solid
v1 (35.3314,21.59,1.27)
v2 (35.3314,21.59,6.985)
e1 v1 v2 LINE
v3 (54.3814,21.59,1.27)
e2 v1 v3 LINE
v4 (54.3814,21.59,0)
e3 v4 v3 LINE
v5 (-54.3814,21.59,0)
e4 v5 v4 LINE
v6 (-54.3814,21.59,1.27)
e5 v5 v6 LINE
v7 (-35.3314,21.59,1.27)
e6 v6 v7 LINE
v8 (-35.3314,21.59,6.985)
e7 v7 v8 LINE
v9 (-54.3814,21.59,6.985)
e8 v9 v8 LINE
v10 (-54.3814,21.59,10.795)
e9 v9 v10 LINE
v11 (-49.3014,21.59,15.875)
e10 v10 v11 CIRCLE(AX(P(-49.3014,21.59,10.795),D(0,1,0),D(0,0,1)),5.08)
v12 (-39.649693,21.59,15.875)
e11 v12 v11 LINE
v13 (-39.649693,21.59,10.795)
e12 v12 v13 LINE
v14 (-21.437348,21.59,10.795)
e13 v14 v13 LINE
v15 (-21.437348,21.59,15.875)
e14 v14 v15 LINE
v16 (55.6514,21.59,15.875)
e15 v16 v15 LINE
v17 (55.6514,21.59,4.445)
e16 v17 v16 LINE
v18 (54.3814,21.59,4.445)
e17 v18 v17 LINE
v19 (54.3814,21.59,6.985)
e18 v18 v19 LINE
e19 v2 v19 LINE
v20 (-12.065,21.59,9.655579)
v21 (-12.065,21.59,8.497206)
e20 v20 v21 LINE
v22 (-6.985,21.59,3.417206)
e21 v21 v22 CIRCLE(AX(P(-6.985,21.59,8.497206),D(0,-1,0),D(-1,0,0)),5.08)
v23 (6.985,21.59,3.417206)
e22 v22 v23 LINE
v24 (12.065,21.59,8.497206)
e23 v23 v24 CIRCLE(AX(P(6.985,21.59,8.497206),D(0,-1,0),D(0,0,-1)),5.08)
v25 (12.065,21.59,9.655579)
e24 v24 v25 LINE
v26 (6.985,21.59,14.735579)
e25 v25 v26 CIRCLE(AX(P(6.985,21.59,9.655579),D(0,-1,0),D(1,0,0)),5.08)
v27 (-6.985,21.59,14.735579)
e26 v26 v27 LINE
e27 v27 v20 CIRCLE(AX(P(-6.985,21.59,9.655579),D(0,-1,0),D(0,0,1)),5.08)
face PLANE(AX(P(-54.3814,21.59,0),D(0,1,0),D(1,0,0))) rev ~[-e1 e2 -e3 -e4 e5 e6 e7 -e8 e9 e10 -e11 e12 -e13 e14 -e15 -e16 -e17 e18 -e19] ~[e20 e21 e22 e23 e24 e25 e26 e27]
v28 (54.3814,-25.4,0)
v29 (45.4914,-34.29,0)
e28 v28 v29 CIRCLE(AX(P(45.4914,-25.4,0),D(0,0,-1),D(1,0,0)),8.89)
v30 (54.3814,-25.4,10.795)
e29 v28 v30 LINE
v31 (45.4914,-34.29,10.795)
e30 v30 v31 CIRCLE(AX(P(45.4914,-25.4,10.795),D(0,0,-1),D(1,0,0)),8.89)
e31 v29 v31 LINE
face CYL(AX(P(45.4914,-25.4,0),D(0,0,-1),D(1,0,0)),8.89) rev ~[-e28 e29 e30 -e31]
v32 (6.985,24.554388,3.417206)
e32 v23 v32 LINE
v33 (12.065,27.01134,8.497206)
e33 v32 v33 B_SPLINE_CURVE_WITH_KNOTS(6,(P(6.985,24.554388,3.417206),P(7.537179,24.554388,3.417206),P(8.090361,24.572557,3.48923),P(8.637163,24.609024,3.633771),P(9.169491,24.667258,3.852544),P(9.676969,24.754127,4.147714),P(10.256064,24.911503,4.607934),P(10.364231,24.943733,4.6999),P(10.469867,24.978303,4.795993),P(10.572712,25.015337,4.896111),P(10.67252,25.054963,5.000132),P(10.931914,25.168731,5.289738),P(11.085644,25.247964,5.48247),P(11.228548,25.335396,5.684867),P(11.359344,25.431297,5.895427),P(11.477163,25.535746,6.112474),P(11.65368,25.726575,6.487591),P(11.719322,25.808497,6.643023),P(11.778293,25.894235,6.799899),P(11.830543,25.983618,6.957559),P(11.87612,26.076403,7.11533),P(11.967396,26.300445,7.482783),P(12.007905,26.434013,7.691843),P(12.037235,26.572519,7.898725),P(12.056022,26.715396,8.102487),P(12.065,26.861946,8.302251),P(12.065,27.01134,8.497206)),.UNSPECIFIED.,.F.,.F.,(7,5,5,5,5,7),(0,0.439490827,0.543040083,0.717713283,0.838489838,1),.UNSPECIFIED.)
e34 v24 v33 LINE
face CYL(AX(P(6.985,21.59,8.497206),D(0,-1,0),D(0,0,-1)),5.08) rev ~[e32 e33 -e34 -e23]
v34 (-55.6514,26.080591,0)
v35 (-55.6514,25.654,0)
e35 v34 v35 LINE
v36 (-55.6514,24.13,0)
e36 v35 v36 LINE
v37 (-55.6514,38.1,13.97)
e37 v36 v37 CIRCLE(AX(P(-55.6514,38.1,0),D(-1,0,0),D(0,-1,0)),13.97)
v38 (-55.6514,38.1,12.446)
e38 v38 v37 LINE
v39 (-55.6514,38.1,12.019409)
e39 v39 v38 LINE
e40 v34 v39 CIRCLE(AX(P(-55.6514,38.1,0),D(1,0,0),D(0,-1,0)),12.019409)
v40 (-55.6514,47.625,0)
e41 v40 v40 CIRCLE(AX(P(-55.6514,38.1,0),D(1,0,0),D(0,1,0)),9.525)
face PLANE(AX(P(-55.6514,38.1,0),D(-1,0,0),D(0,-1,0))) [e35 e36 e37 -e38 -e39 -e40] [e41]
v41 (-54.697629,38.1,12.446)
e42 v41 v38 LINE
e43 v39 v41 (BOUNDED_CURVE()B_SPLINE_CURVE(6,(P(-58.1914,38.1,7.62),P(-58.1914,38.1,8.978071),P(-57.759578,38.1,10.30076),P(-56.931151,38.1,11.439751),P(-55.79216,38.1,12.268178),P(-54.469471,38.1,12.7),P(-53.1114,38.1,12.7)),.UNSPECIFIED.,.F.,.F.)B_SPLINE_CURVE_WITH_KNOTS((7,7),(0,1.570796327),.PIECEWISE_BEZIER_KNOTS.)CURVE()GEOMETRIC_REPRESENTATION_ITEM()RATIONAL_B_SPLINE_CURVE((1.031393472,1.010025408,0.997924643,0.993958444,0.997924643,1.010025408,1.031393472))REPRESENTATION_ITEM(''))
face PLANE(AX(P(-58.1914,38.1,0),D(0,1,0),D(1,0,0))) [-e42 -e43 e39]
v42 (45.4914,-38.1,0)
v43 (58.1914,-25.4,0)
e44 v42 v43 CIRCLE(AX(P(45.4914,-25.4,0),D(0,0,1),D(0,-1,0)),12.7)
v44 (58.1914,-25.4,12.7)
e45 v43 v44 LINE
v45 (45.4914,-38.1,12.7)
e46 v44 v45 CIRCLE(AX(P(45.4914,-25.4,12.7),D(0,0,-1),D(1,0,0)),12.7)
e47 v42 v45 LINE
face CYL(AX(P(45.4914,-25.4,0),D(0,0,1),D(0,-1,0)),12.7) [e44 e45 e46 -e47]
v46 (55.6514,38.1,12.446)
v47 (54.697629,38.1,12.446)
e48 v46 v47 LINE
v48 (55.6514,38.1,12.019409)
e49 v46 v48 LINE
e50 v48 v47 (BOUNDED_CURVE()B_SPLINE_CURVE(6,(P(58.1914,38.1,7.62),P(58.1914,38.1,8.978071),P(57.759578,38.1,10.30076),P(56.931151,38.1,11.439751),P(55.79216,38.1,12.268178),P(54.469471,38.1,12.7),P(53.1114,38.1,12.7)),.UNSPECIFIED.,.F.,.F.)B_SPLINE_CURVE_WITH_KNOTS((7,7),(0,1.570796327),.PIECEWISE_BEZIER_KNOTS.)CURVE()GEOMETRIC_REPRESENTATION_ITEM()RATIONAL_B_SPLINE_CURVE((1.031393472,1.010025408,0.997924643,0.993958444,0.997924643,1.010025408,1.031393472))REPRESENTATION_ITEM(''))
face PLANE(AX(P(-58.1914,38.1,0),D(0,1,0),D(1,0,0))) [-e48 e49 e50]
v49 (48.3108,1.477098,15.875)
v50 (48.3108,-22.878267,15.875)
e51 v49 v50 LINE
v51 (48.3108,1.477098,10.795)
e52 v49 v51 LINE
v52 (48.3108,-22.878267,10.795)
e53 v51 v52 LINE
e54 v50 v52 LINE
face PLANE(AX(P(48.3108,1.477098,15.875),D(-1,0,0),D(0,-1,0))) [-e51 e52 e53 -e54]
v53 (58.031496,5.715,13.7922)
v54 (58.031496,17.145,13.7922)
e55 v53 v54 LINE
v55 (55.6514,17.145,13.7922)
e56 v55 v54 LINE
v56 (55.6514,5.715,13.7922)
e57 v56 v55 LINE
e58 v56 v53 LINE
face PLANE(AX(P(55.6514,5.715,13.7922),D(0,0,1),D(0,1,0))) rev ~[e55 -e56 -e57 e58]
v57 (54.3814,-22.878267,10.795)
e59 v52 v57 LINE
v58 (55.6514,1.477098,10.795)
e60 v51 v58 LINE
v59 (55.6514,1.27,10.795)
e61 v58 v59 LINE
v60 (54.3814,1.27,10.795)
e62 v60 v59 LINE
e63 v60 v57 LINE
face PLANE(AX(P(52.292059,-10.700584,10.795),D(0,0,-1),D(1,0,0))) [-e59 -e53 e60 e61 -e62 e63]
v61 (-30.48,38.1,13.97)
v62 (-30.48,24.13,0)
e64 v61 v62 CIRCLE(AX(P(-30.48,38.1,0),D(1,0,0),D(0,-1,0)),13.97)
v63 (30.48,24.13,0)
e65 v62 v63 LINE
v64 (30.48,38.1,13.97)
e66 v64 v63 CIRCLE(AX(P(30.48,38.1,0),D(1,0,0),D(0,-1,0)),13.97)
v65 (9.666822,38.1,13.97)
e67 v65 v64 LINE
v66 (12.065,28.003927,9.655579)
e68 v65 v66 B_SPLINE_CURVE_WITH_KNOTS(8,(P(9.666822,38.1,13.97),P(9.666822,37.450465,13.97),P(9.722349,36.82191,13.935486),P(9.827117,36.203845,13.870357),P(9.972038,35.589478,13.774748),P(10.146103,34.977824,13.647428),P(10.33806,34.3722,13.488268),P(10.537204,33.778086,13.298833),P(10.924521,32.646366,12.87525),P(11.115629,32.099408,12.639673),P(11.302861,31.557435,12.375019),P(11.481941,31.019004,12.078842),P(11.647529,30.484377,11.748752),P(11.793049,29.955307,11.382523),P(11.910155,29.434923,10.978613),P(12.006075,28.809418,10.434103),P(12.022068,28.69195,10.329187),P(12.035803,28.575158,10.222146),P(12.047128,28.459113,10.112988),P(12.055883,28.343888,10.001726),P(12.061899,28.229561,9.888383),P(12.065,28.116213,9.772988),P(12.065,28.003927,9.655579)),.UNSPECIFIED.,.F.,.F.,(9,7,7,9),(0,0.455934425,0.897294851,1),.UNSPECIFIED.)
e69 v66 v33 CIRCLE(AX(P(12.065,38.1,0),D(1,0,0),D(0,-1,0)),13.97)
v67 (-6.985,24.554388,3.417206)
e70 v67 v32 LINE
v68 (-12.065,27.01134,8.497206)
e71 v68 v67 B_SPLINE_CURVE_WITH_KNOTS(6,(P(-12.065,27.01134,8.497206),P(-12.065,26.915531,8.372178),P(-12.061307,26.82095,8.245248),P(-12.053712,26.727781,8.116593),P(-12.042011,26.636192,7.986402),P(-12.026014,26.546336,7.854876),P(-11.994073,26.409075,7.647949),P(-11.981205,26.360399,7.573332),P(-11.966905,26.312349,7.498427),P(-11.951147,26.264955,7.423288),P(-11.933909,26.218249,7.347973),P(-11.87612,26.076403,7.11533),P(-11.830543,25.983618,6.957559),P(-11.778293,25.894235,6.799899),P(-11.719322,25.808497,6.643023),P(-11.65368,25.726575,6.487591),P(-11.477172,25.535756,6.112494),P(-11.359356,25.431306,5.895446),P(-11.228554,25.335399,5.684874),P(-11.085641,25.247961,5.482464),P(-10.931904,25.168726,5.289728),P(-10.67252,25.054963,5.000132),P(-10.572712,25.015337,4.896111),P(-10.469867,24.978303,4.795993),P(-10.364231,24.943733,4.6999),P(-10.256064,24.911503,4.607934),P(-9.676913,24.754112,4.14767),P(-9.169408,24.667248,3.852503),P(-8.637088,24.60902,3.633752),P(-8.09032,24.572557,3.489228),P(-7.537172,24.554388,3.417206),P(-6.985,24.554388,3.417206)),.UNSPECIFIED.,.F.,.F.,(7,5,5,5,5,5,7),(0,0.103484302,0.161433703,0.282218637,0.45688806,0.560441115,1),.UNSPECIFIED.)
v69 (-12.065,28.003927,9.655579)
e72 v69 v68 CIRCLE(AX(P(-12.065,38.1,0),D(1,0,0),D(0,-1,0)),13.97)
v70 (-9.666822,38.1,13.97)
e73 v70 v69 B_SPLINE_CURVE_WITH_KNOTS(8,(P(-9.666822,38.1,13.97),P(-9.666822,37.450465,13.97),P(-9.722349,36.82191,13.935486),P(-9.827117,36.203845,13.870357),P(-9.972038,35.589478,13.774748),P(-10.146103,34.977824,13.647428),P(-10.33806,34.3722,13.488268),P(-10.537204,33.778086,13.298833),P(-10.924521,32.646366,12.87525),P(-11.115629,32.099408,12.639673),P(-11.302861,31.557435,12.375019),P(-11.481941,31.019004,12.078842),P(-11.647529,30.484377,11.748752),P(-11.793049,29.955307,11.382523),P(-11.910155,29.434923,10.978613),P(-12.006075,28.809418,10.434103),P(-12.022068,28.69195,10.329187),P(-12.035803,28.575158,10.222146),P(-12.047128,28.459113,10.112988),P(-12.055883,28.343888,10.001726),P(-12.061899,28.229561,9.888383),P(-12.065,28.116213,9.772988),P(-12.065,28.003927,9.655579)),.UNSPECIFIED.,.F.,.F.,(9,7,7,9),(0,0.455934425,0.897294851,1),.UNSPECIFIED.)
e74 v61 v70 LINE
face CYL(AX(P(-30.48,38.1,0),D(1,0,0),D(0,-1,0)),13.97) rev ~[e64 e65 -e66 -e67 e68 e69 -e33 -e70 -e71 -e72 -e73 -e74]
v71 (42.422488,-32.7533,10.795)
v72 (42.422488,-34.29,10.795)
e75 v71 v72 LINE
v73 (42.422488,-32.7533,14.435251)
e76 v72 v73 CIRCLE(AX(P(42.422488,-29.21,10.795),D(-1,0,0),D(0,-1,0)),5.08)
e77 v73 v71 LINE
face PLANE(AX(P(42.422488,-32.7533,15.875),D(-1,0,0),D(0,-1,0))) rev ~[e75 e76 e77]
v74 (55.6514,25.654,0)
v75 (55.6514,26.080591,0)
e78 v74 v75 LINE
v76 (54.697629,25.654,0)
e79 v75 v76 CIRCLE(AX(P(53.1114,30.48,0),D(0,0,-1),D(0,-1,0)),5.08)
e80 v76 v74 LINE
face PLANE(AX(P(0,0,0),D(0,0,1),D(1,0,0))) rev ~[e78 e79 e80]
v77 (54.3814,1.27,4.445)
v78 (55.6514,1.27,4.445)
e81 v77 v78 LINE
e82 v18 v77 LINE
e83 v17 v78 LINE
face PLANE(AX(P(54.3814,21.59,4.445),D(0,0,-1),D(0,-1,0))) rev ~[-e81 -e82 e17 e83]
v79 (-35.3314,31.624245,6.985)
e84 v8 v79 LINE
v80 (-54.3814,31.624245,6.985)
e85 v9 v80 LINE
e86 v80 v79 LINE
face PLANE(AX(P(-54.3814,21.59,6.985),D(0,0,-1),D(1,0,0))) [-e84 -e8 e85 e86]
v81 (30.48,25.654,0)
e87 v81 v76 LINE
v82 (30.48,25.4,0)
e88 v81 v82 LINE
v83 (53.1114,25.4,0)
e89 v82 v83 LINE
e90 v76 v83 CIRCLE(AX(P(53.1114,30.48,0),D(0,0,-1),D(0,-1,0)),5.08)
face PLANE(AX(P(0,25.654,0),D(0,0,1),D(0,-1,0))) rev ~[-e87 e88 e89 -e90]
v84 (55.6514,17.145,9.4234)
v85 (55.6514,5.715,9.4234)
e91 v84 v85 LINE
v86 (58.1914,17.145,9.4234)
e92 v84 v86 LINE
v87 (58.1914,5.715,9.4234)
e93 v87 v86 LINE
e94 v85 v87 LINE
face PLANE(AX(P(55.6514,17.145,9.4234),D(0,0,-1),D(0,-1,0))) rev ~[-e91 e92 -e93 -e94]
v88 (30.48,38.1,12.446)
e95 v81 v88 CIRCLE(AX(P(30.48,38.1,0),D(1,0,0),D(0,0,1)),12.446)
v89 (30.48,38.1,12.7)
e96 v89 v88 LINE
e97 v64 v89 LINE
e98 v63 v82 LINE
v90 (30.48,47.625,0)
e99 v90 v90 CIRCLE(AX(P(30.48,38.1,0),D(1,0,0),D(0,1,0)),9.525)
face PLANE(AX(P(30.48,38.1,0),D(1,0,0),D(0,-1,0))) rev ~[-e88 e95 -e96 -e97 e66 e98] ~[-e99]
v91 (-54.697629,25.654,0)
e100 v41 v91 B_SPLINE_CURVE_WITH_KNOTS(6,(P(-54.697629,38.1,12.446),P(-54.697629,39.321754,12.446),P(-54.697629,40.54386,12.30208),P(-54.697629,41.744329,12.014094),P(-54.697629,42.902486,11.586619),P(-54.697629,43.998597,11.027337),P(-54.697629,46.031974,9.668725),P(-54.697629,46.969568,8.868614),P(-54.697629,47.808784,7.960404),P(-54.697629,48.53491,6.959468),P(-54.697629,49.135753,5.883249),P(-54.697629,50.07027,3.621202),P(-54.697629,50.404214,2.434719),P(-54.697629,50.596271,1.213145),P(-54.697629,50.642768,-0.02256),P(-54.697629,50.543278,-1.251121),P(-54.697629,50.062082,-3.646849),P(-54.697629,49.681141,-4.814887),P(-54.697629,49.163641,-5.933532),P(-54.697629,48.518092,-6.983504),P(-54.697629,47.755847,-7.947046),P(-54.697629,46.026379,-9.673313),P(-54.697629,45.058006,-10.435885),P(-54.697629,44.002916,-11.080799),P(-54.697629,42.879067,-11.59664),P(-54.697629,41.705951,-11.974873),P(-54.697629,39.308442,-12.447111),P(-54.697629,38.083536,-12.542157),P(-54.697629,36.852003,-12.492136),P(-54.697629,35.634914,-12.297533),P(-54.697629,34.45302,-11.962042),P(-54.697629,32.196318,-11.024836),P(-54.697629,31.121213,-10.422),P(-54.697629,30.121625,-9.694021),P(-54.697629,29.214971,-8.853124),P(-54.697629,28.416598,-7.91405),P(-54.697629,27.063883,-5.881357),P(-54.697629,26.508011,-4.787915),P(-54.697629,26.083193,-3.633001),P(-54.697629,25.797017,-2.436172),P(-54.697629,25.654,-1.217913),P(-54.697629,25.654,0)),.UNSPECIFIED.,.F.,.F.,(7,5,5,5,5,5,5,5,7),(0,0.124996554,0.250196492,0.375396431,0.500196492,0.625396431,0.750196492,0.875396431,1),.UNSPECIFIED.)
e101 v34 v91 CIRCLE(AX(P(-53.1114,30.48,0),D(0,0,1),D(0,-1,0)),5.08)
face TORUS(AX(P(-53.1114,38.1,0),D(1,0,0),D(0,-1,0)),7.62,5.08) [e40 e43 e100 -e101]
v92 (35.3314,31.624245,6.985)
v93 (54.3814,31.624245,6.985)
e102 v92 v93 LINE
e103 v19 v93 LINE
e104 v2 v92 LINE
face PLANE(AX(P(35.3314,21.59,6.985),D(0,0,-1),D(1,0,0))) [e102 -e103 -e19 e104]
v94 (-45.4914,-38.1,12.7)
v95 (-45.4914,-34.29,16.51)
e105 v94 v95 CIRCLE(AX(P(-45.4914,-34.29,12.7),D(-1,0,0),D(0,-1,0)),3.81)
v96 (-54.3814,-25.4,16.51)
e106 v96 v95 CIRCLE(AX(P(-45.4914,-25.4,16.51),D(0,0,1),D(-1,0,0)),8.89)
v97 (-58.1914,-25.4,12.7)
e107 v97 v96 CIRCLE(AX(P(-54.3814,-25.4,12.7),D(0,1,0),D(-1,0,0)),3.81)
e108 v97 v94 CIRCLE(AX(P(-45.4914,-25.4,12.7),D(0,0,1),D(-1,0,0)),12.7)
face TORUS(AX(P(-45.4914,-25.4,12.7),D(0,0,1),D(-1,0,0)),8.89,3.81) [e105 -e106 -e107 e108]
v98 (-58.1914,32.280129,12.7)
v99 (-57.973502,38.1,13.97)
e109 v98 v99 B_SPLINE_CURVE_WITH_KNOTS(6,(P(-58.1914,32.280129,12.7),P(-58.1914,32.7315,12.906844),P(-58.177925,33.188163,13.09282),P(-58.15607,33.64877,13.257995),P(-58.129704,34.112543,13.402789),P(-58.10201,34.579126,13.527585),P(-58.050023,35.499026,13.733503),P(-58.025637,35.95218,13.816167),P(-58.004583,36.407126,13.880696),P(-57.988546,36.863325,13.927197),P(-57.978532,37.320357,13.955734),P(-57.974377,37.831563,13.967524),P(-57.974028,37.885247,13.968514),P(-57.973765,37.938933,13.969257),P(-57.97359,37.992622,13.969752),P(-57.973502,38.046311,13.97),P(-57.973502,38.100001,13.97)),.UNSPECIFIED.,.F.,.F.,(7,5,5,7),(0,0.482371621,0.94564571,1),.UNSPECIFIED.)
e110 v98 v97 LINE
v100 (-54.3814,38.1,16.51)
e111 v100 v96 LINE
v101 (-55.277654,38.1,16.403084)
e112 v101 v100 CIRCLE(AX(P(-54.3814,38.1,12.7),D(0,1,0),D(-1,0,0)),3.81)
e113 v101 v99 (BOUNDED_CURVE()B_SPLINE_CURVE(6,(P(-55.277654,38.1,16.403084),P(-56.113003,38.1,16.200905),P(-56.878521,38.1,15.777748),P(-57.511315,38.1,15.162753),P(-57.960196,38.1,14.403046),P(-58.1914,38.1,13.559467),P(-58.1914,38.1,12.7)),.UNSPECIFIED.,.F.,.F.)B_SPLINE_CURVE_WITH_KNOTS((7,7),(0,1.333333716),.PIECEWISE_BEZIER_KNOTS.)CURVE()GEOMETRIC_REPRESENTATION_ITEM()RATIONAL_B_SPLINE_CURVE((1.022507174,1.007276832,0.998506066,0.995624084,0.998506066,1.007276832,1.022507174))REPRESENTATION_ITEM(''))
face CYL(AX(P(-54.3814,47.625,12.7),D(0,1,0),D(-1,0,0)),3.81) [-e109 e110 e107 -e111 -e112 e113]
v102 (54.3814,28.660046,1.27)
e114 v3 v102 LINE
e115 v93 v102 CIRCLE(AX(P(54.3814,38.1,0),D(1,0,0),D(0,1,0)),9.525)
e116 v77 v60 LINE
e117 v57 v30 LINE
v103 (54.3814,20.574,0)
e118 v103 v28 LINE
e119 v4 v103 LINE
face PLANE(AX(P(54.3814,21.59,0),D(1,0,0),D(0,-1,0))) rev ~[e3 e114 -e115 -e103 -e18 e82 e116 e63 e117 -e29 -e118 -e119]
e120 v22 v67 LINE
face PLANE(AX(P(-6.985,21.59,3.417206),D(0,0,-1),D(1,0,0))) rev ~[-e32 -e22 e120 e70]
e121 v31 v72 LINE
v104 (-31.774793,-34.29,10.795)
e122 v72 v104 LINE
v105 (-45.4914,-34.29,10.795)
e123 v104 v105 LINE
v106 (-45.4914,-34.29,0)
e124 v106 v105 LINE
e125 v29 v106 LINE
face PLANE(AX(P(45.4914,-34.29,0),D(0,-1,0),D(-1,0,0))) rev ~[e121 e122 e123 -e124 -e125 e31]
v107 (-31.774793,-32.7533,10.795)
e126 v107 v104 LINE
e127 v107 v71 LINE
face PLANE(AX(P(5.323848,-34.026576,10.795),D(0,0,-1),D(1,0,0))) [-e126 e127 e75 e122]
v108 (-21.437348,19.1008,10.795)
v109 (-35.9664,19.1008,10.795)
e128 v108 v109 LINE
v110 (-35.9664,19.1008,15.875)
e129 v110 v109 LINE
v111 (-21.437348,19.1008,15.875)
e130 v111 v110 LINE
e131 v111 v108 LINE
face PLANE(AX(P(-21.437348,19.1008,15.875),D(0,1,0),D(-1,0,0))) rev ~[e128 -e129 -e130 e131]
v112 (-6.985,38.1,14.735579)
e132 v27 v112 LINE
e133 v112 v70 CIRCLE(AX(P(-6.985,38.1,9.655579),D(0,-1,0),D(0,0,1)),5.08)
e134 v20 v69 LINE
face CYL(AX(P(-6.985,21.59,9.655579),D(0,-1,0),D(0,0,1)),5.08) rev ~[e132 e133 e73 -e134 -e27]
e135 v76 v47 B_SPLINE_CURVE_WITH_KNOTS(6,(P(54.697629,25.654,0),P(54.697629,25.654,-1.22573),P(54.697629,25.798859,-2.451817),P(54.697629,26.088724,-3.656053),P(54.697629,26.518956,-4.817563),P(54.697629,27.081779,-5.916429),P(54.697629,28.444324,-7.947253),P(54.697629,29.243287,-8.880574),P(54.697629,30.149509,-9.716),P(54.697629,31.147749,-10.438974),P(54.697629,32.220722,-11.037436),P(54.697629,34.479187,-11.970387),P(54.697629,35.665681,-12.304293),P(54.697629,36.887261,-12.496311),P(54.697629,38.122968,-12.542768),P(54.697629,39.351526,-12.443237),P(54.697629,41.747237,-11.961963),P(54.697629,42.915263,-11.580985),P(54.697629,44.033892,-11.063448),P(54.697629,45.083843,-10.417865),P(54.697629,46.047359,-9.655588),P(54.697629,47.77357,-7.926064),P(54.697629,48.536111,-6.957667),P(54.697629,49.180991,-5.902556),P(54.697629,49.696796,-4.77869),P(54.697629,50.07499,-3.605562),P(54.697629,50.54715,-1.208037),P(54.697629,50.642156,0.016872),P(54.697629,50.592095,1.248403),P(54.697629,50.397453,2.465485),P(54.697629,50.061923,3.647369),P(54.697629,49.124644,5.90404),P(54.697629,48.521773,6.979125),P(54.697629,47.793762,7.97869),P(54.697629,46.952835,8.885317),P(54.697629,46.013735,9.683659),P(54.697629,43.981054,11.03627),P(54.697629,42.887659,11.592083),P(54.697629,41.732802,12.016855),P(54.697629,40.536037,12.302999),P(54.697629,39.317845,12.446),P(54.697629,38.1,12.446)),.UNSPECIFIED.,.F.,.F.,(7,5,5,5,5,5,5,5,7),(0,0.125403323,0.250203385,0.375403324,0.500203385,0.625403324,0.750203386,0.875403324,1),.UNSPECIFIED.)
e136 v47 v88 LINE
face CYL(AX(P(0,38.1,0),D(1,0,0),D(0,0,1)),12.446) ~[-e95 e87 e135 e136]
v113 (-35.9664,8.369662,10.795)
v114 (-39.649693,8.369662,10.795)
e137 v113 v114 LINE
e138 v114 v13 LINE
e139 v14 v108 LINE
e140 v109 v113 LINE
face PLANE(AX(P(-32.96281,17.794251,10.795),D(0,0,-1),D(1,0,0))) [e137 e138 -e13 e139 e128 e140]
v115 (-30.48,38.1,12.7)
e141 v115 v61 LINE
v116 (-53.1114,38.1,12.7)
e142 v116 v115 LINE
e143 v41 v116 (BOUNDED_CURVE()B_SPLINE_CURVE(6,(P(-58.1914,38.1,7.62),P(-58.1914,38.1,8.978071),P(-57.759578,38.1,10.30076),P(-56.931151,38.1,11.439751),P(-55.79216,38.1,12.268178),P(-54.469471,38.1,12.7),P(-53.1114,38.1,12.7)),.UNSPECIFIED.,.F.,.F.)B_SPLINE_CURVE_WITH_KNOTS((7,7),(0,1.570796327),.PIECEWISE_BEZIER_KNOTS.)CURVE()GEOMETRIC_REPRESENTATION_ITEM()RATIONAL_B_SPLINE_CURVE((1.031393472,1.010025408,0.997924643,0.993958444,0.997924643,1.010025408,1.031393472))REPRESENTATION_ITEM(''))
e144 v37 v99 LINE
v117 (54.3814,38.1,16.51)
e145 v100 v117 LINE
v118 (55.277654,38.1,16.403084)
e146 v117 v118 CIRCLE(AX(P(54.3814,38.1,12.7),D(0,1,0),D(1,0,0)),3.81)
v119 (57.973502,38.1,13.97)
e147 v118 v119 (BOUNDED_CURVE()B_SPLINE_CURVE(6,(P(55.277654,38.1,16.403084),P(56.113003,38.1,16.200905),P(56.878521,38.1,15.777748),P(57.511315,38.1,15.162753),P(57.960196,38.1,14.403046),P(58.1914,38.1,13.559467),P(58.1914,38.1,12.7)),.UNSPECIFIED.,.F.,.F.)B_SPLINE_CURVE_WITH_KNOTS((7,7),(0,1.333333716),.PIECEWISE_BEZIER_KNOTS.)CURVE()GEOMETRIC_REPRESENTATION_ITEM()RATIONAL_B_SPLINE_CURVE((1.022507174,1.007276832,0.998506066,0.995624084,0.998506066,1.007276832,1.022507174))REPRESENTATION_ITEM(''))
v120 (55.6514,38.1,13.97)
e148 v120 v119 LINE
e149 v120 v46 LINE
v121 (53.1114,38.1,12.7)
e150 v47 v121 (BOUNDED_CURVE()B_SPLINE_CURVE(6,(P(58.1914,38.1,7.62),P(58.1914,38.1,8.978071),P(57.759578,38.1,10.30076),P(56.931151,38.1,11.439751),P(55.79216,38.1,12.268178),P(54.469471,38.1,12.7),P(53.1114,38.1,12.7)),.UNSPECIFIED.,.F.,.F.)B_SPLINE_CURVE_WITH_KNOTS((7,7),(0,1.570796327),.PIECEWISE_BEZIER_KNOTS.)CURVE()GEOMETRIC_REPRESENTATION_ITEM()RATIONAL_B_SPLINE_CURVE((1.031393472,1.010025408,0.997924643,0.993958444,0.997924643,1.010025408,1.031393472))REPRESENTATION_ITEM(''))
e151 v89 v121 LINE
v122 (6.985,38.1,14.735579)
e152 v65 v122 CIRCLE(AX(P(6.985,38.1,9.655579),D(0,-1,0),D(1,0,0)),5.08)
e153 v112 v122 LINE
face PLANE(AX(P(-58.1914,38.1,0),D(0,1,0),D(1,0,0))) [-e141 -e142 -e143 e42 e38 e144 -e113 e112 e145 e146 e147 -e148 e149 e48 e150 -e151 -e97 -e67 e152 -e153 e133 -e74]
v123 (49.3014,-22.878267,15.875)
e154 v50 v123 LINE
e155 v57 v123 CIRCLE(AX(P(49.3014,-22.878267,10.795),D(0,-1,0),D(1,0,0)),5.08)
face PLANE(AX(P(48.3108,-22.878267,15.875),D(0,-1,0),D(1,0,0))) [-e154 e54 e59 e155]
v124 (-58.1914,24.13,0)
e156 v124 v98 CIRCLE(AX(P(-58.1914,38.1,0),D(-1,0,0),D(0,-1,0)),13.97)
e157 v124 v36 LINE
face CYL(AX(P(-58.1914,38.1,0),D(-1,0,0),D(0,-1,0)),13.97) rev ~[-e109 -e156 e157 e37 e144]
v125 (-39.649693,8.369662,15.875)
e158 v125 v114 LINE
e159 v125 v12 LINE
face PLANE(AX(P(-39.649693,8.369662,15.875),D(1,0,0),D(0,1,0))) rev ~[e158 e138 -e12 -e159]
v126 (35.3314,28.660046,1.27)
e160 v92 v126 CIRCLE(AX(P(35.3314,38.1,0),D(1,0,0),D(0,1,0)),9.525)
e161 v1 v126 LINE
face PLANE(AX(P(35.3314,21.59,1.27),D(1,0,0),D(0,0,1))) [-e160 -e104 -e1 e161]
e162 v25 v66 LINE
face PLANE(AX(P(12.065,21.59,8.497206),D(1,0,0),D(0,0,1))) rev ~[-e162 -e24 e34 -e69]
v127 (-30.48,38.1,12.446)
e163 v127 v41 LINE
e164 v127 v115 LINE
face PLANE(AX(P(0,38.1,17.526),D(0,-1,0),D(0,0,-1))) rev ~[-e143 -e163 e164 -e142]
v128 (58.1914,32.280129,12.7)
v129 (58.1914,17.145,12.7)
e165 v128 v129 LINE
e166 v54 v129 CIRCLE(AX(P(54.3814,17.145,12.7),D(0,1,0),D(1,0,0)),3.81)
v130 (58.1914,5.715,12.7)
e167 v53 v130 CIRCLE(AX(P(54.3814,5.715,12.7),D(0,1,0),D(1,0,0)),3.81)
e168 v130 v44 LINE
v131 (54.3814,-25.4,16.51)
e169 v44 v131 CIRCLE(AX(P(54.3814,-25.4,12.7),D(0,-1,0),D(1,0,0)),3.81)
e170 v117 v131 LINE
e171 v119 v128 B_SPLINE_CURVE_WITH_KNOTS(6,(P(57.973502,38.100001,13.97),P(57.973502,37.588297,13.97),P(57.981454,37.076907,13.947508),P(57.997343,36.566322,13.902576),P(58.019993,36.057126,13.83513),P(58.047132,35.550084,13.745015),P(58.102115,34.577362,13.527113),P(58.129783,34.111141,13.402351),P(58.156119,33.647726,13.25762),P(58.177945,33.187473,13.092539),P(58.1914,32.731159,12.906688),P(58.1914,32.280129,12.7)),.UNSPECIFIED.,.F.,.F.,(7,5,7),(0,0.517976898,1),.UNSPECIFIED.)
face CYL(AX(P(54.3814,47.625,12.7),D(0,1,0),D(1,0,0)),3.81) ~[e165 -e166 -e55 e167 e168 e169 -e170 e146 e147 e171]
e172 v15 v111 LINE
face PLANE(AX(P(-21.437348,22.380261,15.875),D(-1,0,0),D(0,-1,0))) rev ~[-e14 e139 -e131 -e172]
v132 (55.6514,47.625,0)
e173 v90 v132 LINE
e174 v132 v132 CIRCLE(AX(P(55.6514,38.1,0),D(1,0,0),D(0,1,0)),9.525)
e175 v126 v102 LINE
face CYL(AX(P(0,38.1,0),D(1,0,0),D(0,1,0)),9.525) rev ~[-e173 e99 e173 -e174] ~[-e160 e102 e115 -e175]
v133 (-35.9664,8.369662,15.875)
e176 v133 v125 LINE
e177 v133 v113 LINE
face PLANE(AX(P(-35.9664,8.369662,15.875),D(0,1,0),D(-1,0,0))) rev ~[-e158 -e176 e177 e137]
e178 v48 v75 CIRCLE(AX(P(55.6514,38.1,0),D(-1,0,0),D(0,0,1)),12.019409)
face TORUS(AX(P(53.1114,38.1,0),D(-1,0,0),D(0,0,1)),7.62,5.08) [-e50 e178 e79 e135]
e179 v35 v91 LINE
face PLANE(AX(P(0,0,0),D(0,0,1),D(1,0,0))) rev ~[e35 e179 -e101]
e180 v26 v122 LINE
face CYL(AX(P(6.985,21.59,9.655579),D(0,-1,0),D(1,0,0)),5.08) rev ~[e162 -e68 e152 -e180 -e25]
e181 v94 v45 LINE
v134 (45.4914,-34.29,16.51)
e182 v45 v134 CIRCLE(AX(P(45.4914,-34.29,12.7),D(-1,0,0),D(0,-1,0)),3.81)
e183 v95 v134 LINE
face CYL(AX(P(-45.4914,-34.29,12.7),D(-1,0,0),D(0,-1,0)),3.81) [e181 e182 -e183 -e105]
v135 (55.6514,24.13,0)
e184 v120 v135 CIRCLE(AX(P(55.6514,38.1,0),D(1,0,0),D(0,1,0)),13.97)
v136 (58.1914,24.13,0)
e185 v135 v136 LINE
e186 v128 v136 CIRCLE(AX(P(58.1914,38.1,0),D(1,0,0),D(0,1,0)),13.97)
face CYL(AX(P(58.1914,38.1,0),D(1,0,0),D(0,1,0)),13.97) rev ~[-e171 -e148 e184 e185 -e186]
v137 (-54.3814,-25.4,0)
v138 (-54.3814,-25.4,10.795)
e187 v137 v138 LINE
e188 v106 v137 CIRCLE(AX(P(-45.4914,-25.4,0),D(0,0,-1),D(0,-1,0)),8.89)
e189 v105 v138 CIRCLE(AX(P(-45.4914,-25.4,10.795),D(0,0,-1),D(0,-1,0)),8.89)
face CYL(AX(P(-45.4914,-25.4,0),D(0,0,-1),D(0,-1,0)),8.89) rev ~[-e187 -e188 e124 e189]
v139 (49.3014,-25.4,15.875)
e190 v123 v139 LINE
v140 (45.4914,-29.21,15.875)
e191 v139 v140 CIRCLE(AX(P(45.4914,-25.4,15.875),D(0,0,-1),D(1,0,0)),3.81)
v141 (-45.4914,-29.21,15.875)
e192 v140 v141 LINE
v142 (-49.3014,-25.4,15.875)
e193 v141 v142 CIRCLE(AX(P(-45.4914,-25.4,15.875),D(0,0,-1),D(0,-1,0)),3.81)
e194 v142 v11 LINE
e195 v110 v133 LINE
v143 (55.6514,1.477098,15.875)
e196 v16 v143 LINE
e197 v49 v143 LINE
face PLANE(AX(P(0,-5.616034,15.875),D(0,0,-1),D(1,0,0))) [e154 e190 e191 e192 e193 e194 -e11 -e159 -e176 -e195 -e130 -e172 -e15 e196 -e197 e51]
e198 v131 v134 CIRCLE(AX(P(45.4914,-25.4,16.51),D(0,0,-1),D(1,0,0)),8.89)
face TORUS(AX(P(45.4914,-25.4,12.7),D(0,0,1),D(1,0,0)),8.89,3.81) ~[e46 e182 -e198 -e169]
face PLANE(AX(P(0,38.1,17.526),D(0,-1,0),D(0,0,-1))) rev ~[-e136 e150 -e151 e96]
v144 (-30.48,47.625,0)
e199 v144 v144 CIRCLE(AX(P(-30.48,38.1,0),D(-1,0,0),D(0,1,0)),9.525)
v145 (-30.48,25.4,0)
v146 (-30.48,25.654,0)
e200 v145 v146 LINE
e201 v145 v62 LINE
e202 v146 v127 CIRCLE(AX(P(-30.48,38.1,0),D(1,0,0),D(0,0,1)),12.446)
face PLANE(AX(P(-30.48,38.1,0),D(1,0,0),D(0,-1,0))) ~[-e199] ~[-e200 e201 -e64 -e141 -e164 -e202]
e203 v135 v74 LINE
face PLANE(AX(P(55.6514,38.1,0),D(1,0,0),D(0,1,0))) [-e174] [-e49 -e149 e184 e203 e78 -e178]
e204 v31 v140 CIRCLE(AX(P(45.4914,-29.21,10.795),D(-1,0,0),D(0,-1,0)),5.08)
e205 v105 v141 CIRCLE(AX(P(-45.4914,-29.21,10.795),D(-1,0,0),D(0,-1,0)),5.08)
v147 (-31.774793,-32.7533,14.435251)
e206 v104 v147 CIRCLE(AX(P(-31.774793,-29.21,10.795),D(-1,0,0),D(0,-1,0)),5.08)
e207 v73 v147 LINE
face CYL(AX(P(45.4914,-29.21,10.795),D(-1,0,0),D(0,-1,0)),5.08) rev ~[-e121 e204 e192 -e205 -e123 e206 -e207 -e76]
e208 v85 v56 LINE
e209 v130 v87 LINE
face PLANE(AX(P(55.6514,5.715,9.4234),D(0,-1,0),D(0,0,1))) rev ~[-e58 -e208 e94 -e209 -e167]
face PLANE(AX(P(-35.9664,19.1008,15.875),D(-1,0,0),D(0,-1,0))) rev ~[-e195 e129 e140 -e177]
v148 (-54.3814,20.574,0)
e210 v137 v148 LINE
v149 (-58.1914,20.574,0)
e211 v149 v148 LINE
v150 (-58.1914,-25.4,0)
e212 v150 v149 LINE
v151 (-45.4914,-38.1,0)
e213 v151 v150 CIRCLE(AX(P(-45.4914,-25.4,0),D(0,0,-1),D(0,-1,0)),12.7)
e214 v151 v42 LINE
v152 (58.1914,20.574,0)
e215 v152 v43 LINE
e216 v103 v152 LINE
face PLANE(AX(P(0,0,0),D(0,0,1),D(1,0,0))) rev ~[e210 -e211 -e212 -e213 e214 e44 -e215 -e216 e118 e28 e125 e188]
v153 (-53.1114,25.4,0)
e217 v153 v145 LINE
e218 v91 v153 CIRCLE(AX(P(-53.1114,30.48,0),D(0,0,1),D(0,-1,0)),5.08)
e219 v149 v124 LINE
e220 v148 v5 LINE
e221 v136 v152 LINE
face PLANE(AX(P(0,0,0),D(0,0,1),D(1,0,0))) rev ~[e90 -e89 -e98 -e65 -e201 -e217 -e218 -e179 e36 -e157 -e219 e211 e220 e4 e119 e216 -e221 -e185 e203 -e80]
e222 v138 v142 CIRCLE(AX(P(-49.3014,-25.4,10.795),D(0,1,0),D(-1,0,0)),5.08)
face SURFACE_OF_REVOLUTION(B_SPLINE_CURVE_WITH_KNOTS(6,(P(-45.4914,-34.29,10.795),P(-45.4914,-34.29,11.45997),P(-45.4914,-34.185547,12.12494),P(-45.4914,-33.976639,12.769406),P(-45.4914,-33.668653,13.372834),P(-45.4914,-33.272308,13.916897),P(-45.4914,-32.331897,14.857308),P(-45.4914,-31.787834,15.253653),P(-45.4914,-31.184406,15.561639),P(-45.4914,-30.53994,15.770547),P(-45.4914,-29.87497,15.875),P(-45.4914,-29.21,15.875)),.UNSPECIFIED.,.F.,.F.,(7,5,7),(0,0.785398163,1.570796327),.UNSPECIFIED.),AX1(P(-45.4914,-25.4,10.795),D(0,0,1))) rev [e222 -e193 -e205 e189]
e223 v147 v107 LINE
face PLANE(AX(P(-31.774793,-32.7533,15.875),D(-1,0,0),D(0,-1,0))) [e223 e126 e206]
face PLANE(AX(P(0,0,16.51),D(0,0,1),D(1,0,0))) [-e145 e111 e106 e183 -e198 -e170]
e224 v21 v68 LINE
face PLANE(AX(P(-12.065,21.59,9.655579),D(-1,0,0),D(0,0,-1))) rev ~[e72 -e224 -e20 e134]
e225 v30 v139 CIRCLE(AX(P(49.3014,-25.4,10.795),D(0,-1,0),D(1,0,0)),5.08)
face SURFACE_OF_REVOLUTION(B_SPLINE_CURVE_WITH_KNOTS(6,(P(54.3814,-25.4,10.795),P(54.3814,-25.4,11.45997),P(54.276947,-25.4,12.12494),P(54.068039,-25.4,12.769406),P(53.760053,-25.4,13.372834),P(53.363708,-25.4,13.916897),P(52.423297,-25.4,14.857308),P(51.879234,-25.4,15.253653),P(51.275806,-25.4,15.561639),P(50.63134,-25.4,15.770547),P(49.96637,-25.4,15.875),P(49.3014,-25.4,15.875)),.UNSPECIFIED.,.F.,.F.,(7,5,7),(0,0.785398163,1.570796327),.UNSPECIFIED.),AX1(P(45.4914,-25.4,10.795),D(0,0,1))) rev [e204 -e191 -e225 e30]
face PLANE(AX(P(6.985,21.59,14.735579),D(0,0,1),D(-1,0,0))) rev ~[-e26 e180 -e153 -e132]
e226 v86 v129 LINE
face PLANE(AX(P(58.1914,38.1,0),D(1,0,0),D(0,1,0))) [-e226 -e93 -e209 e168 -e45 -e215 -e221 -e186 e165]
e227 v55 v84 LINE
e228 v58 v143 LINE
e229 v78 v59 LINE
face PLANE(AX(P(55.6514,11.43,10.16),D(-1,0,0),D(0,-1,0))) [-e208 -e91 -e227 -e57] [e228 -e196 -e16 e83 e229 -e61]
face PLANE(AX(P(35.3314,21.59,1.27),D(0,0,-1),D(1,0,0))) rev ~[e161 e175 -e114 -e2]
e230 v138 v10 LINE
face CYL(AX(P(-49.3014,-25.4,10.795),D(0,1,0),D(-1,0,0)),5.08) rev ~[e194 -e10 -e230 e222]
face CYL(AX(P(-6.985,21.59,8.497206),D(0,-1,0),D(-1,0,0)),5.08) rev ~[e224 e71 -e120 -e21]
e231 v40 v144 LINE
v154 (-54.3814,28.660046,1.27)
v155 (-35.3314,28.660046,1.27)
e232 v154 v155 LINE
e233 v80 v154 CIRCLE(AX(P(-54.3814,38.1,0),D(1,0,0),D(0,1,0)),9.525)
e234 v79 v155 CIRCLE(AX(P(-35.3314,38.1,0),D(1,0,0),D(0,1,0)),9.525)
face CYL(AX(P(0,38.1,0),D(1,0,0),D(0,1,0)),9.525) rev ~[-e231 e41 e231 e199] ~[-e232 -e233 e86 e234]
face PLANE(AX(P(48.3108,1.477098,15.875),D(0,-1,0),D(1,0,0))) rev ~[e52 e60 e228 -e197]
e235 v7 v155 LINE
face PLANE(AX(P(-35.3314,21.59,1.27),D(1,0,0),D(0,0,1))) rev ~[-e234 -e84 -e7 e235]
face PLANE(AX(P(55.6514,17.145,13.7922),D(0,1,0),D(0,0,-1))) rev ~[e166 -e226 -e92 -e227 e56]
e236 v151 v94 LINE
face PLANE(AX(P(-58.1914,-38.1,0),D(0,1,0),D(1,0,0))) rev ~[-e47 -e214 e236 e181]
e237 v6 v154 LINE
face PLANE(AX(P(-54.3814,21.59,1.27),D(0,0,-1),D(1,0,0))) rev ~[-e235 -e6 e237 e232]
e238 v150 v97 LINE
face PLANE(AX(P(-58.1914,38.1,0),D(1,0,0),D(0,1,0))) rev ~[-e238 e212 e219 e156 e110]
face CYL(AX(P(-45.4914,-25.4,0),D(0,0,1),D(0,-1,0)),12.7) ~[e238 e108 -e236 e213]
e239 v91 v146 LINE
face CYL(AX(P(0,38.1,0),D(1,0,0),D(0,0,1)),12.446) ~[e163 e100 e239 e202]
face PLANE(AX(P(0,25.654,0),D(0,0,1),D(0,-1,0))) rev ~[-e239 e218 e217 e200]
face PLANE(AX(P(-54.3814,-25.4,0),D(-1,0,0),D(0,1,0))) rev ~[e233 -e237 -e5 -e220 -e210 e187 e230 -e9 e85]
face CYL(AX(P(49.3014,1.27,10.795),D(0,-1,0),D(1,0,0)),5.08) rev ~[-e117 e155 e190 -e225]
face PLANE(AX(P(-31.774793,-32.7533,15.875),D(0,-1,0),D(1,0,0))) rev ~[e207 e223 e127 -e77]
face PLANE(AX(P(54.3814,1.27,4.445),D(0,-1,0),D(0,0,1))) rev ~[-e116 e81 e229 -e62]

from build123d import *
from build123d import SkipClean  # not in build123d's __all__

# Parameters (mm, degrees)
F0_W           = 116.3828
F0_H           = 76.2
F1_DEPTH       = 16.51
F2_R           = 12.7
F3_DEPTH       = 58.1914
F4_R           = 12.7
F6_DEPTH       = 15.875
F7_R           = 6.985
F10_DEPTH      = 53.34
F10_DEPTH_BACK = 53.34
F11_W          = 19.05
F11_H          = 5.715
F12_DEPTH      = 17.78
F13_W          = 20.32
F13_H          = 11.43
F14_DEPTH      = 1.27
F16_DEPTH      = 25.4
F17_R          = 5.08
F18_W          = 7.9625188272
F18_H          = 24.355364847
F18_W_2        = 74.197281152
F18_H_2        = 2.5465525687
F19_DEPTH      = 5.08
F20_T1_DEPTH   = 73.025
F20_T3_DEPTH   = 90.9828
F20_T6_ANGLE   = 90
F20_T8_ANGLE   = 90
F21_R          = 5.08
F22_R          = 13.97
F23_DEPTH      = 2.54
F24_R          = 13.97
F25_DEPTH      = 2.54
F26_R          = 9.525
F27_DEPTH      = 63.5
F29_DEPTH      = 25.4
F31_DEPTH      = 63.5


# Not quite as in the source:
# - a fillet or chamfer that OpenCascade refuses, or shapes differently, is made with other operations: its cross-section is extruded or revolved along the edge and cut away or added


with BuildPart() as f1:
    # F0 (on Top) → F1 (new body)
    with BuildSketch(Plane.XY):
        Rectangle(F0_W, F0_H)
    extrude(amount=F1_DEPTH)

    # F2 (on Right) → F3 (join, symmetric)
    with BuildSketch(Plane.YZ):
        with Locations((38.1, 0)):
            Circle(F2_R)
    extrude(amount=F3_DEPTH, both=True)

    # F4
    f4_edges = [f1.edges().sort_by_distance(p)[0] for p in [
        (-58.1914, -38.1, 8.255),
        (58.1914, -38.1, 8.255),
    ]]
    fillet(f4_edges, radius=F4_R)

    # F5 (on face) → F6 (cut)
    with BuildSketch(Plane(origin=(0, 0, 0), x_dir=(1, 0, 0), z_dir=(0, 0, -1))):
        with BuildLine():
            Line((-54.3814, 25.4), (-54.3814, -21.59))
            Line((-54.3814, -21.59), (54.3814, -21.59))
            Line((54.3814, -21.59), (54.3814, 25.4))
            ThreePointArc((54.3814, 25.4), (51.7775792847, 31.6861792847), (45.4914, 34.29))
            Line((45.4914, 34.29), (-45.4914, 34.29))
            ThreePointArc((-45.4914, 34.29), (-51.7775792847, 31.6861792847), (-54.3814, 25.4))
        make_face()
    extrude(amount=-F6_DEPTH, mode=Mode.SUBTRACT)

    # F8 (on Top) → F9 (revolve, cut)
    with BuildSketch(Plane.XY):
        Polygon((-30.48, 28.575), (-30.48, 25.4), (-30.48, 24.13), (30.48, 24.13), (30.48, 25.4), (30.48, 28.575), (24.13, 28.575), (19.05, 28.575), (19.05, 38.1), (0, 38.1), (-19.05, 38.1), (-19.05, 28.575), (-24.13, 28.575), align=None)
    revolve(axis=Axis((-9.525, 38.1, 0), (1, 0, 0)), mode=Mode.SUBTRACT)

    # F7 (on Right) → F10 (cut, two sides)
    with BuildSketch(Plane.YZ) as f10_sk:
        with Locations((38.1, 0)):
            Circle(F7_R)
    extrude(amount=F10_DEPTH, mode=Mode.SUBTRACT)
    extrude(f10_sk.sketch, amount=-F10_DEPTH_BACK, mode=Mode.SUBTRACT)

    # F11 (on face) → F12 (cut)
    with BuildSketch(Plane.XZ.offset(-21.59)):
        with Locations((44.8564, 4.1275)):
            Rectangle(F11_W, F11_H)
        with Locations((-44.8564, 4.1275)):
            Rectangle(F11_W, F11_H)
    extrude(amount=-F12_DEPTH, mode=Mode.SUBTRACT)

    # F13 (on face) → F14 (cut)
    with BuildSketch(Plane(origin=(54.3814, 0, 0), x_dir=(0, -1, 0), z_dir=(-1, 0, 0))):
        with Locations((-11.43, 10.16)):
            Rectangle(F13_W, F13_H)
    extrude(amount=-F14_DEPTH, mode=Mode.SUBTRACT)

    # F15 (on face) → F16 (cut)
    with BuildSketch(Plane(origin=(55.6514, 0, 0), x_dir=(0, -1, 0), z_dir=(-1, 0, 0))):
        Polygon((-17.145, 9.4234), (-5.715, 9.4234), (-5.715, 13.7922), (-11.43, 13.7922), (-17.145, 13.7922), align=None)
    extrude(amount=-F16_DEPTH, mode=Mode.SUBTRACT)

    # F17
    f17_edges = [f1.edges().sort_by_distance(p)[0] for p in [
        (-54.3814, -1.905, 15.875),
    ]]
    fillet(f17_edges, radius=F17_R)

    # F18 (on face) → F19 (join)
    with BuildSketch(Plane(origin=(0, 0, 15.875), x_dir=(1, 0, 0), z_dir=(0, 0, -1))):
        with Locations((52.2920594136, 10.7005844475)):
            Rectangle(F18_W, F18_H)
        Polygon((-35.9664, -19.1008), (-35.9664, -8.3696618676), (-39.6496931181, -8.3696618676), (-39.6496931181, -22.3802613997), (-21.43734819, -22.3802613997), (-21.43734819, -19.1008), align=None)
        with Locations((5.3238477558, 34.0265762843)):
            Rectangle(F18_W_2, F18_H_2)
    extrude(amount=F19_DEPTH)

    # F20: fillet of radius 3.81 on 1 edges, made by hand

    # F20_s2 → F20_t1 (cut)
    with BuildSketch(Plane.XZ.offset(-47.625)):
        with BuildLine():
            ThreePointArc((-58.1914, 12.7), (-57.0754768363, 15.3940768363), (-54.3814, 16.51))
            Line((-54.3814, 16.51), (-58.1914, 16.51))
            Line((-58.1914, 16.51), (-58.1914, 12.7))
        make_face()
        with BuildLine():
            ThreePointArc((58.1914, 12.7), (57.0754768363, 15.3940768363), (54.3814, 16.51))
            Line((54.3814, 16.51), (58.1914, 16.51))
            Line((58.1914, 16.51), (58.1914, 12.7))
        make_face()
    extrude(amount=F20_T1_DEPTH, mode=Mode.SUBTRACT)

    # F20_s4 → F20_t3 (cut)
    with BuildSketch(Plane.YZ.offset(-45.4914)):
        with BuildLine():
            ThreePointArc((-38.1, 12.7), (-36.9840768363, 15.3940768363), (-34.29, 16.51))
            Line((-34.29, 16.51), (-38.1, 16.51))
            Line((-38.1, 16.51), (-38.1, 12.7))
        make_face()
    extrude(amount=F20_T3_DEPTH, mode=Mode.SUBTRACT)

    # F20_s5 → F20_t6 (revolve, cut)
    with BuildSketch(Plane.XZ.offset(25.4)):
        with BuildLine():
            ThreePointArc((-58.1914, 12.7), (-57.0754768363, 15.3940768363), (-54.3814, 16.51))
            Line((-54.3814, 16.51), (-58.1914, 16.51))
            Line((-58.1914, 16.51), (-58.1914, 12.7))
        make_face()
    revolve(axis=Axis((-45.4914, -25.4, 16.51), (0, 0, 1)), revolution_arc=F20_T6_ANGLE, mode=Mode.SUBTRACT)

    # F20_s7 → F20_t8 (revolve, cut)
    with BuildSketch(Plane.XZ.offset(25.4)):
        with BuildLine():
            ThreePointArc((58.1914, 12.7), (57.0754768363, 15.3940768363), (54.3814, 16.51))
            Line((54.3814, 16.51), (58.1914, 16.51))
            Line((58.1914, 16.51), (58.1914, 12.7))
        make_face()
    revolve(axis=Axis((45.4914, -25.4, 16.51), (0, 0, -1)), revolution_arc=F20_T8_ANGLE, mode=Mode.SUBTRACT)

    # F21
    f21_edges = [f1.edges().sort_by_distance(p)[0] for p in [
        (58.1914, 47.080256, -8.980256),
        (-58.1914, 47.080256, -8.980256),
    ]]
    fillet(f21_edges, radius=F21_R)

    # F22 (on face) → F23 (cut)
    with BuildSketch(Plane(origin=(-58.1914, 0, 0), x_dir=(0, -1, 0), z_dir=(-1, 0, 0))):
        with Locations((-38.1, 0)):
            Circle(F22_R)
    extrude(amount=-F23_DEPTH, mode=Mode.SUBTRACT)

    # F24 (on face) → F25 (cut)
    with BuildSketch(Plane.YZ.offset(58.1914)):
        with Locations((38.1, 0)):
            Circle(F24_R)
    extrude(amount=-F25_DEPTH, mode=Mode.SUBTRACT)

    # F26 (on Right) → F27 (cut, symmetric)
    with BuildSketch(Plane.YZ):
        with Locations((38.1, 0)):
            Circle(F26_R)
    extrude(amount=F27_DEPTH, both=True, mode=Mode.SUBTRACT)

    # F28 (on face) → F29 (cut)
    with BuildSketch(Plane.XZ.offset(-21.59)):
        with BuildLine():
            ThreePointArc((12.065, 9.6555790053), (10.5771024484, 13.2476814537), (6.985, 14.7355790053))
            Line((6.985, 14.7355790053), (-6.985, 14.7355790053))
            ThreePointArc((-6.985, 14.7355790053), (-10.5771024484, 13.2476814537), (-12.065, 9.6555790053))
            Line((-12.065, 9.6555790053), (-12.065, 8.4972062227))
            ThreePointArc((-12.065, 8.4972062227), (-10.5771024484, 4.9051037742), (-6.985, 3.4172062227))
            Line((-6.985, 3.4172062227), (6.985, 3.4172062227))
            ThreePointArc((6.985, 3.4172062227), (10.5771024484, 4.9051037742), (12.065, 8.4972062227))
            Line((12.065, 8.4972062227), (12.065, 9.6555790053))
        make_face()
    extrude(amount=-F29_DEPTH, mode=Mode.SUBTRACT)

    # F30 (on Right) → F31 (cut, symmetric)
    with BuildSketch(Plane.YZ):
        with BuildLine():
            ThreePointArc((38.1, 12.446), (46.9006509986, -8.8006509986), (25.654, 0))
            Line((25.654, 0), (20.574, 0))
            Line((20.574, 0), (20.574, -20.574))
            Line((20.574, -20.574), (58.674, -20.574))
            Line((58.674, -20.574), (58.674, 17.526))
            Line((58.674, 17.526), (38.1, 17.526))
            Line((38.1, 17.526), (38.1, 12.446))
        make_face()
    with SkipClean():  # cleaning this boolean's faces spoils the solid; the shape is the same uncleaned
        extrude(amount=F31_DEPTH, both=True, mode=Mode.SUBTRACT)


solid = f1.part
